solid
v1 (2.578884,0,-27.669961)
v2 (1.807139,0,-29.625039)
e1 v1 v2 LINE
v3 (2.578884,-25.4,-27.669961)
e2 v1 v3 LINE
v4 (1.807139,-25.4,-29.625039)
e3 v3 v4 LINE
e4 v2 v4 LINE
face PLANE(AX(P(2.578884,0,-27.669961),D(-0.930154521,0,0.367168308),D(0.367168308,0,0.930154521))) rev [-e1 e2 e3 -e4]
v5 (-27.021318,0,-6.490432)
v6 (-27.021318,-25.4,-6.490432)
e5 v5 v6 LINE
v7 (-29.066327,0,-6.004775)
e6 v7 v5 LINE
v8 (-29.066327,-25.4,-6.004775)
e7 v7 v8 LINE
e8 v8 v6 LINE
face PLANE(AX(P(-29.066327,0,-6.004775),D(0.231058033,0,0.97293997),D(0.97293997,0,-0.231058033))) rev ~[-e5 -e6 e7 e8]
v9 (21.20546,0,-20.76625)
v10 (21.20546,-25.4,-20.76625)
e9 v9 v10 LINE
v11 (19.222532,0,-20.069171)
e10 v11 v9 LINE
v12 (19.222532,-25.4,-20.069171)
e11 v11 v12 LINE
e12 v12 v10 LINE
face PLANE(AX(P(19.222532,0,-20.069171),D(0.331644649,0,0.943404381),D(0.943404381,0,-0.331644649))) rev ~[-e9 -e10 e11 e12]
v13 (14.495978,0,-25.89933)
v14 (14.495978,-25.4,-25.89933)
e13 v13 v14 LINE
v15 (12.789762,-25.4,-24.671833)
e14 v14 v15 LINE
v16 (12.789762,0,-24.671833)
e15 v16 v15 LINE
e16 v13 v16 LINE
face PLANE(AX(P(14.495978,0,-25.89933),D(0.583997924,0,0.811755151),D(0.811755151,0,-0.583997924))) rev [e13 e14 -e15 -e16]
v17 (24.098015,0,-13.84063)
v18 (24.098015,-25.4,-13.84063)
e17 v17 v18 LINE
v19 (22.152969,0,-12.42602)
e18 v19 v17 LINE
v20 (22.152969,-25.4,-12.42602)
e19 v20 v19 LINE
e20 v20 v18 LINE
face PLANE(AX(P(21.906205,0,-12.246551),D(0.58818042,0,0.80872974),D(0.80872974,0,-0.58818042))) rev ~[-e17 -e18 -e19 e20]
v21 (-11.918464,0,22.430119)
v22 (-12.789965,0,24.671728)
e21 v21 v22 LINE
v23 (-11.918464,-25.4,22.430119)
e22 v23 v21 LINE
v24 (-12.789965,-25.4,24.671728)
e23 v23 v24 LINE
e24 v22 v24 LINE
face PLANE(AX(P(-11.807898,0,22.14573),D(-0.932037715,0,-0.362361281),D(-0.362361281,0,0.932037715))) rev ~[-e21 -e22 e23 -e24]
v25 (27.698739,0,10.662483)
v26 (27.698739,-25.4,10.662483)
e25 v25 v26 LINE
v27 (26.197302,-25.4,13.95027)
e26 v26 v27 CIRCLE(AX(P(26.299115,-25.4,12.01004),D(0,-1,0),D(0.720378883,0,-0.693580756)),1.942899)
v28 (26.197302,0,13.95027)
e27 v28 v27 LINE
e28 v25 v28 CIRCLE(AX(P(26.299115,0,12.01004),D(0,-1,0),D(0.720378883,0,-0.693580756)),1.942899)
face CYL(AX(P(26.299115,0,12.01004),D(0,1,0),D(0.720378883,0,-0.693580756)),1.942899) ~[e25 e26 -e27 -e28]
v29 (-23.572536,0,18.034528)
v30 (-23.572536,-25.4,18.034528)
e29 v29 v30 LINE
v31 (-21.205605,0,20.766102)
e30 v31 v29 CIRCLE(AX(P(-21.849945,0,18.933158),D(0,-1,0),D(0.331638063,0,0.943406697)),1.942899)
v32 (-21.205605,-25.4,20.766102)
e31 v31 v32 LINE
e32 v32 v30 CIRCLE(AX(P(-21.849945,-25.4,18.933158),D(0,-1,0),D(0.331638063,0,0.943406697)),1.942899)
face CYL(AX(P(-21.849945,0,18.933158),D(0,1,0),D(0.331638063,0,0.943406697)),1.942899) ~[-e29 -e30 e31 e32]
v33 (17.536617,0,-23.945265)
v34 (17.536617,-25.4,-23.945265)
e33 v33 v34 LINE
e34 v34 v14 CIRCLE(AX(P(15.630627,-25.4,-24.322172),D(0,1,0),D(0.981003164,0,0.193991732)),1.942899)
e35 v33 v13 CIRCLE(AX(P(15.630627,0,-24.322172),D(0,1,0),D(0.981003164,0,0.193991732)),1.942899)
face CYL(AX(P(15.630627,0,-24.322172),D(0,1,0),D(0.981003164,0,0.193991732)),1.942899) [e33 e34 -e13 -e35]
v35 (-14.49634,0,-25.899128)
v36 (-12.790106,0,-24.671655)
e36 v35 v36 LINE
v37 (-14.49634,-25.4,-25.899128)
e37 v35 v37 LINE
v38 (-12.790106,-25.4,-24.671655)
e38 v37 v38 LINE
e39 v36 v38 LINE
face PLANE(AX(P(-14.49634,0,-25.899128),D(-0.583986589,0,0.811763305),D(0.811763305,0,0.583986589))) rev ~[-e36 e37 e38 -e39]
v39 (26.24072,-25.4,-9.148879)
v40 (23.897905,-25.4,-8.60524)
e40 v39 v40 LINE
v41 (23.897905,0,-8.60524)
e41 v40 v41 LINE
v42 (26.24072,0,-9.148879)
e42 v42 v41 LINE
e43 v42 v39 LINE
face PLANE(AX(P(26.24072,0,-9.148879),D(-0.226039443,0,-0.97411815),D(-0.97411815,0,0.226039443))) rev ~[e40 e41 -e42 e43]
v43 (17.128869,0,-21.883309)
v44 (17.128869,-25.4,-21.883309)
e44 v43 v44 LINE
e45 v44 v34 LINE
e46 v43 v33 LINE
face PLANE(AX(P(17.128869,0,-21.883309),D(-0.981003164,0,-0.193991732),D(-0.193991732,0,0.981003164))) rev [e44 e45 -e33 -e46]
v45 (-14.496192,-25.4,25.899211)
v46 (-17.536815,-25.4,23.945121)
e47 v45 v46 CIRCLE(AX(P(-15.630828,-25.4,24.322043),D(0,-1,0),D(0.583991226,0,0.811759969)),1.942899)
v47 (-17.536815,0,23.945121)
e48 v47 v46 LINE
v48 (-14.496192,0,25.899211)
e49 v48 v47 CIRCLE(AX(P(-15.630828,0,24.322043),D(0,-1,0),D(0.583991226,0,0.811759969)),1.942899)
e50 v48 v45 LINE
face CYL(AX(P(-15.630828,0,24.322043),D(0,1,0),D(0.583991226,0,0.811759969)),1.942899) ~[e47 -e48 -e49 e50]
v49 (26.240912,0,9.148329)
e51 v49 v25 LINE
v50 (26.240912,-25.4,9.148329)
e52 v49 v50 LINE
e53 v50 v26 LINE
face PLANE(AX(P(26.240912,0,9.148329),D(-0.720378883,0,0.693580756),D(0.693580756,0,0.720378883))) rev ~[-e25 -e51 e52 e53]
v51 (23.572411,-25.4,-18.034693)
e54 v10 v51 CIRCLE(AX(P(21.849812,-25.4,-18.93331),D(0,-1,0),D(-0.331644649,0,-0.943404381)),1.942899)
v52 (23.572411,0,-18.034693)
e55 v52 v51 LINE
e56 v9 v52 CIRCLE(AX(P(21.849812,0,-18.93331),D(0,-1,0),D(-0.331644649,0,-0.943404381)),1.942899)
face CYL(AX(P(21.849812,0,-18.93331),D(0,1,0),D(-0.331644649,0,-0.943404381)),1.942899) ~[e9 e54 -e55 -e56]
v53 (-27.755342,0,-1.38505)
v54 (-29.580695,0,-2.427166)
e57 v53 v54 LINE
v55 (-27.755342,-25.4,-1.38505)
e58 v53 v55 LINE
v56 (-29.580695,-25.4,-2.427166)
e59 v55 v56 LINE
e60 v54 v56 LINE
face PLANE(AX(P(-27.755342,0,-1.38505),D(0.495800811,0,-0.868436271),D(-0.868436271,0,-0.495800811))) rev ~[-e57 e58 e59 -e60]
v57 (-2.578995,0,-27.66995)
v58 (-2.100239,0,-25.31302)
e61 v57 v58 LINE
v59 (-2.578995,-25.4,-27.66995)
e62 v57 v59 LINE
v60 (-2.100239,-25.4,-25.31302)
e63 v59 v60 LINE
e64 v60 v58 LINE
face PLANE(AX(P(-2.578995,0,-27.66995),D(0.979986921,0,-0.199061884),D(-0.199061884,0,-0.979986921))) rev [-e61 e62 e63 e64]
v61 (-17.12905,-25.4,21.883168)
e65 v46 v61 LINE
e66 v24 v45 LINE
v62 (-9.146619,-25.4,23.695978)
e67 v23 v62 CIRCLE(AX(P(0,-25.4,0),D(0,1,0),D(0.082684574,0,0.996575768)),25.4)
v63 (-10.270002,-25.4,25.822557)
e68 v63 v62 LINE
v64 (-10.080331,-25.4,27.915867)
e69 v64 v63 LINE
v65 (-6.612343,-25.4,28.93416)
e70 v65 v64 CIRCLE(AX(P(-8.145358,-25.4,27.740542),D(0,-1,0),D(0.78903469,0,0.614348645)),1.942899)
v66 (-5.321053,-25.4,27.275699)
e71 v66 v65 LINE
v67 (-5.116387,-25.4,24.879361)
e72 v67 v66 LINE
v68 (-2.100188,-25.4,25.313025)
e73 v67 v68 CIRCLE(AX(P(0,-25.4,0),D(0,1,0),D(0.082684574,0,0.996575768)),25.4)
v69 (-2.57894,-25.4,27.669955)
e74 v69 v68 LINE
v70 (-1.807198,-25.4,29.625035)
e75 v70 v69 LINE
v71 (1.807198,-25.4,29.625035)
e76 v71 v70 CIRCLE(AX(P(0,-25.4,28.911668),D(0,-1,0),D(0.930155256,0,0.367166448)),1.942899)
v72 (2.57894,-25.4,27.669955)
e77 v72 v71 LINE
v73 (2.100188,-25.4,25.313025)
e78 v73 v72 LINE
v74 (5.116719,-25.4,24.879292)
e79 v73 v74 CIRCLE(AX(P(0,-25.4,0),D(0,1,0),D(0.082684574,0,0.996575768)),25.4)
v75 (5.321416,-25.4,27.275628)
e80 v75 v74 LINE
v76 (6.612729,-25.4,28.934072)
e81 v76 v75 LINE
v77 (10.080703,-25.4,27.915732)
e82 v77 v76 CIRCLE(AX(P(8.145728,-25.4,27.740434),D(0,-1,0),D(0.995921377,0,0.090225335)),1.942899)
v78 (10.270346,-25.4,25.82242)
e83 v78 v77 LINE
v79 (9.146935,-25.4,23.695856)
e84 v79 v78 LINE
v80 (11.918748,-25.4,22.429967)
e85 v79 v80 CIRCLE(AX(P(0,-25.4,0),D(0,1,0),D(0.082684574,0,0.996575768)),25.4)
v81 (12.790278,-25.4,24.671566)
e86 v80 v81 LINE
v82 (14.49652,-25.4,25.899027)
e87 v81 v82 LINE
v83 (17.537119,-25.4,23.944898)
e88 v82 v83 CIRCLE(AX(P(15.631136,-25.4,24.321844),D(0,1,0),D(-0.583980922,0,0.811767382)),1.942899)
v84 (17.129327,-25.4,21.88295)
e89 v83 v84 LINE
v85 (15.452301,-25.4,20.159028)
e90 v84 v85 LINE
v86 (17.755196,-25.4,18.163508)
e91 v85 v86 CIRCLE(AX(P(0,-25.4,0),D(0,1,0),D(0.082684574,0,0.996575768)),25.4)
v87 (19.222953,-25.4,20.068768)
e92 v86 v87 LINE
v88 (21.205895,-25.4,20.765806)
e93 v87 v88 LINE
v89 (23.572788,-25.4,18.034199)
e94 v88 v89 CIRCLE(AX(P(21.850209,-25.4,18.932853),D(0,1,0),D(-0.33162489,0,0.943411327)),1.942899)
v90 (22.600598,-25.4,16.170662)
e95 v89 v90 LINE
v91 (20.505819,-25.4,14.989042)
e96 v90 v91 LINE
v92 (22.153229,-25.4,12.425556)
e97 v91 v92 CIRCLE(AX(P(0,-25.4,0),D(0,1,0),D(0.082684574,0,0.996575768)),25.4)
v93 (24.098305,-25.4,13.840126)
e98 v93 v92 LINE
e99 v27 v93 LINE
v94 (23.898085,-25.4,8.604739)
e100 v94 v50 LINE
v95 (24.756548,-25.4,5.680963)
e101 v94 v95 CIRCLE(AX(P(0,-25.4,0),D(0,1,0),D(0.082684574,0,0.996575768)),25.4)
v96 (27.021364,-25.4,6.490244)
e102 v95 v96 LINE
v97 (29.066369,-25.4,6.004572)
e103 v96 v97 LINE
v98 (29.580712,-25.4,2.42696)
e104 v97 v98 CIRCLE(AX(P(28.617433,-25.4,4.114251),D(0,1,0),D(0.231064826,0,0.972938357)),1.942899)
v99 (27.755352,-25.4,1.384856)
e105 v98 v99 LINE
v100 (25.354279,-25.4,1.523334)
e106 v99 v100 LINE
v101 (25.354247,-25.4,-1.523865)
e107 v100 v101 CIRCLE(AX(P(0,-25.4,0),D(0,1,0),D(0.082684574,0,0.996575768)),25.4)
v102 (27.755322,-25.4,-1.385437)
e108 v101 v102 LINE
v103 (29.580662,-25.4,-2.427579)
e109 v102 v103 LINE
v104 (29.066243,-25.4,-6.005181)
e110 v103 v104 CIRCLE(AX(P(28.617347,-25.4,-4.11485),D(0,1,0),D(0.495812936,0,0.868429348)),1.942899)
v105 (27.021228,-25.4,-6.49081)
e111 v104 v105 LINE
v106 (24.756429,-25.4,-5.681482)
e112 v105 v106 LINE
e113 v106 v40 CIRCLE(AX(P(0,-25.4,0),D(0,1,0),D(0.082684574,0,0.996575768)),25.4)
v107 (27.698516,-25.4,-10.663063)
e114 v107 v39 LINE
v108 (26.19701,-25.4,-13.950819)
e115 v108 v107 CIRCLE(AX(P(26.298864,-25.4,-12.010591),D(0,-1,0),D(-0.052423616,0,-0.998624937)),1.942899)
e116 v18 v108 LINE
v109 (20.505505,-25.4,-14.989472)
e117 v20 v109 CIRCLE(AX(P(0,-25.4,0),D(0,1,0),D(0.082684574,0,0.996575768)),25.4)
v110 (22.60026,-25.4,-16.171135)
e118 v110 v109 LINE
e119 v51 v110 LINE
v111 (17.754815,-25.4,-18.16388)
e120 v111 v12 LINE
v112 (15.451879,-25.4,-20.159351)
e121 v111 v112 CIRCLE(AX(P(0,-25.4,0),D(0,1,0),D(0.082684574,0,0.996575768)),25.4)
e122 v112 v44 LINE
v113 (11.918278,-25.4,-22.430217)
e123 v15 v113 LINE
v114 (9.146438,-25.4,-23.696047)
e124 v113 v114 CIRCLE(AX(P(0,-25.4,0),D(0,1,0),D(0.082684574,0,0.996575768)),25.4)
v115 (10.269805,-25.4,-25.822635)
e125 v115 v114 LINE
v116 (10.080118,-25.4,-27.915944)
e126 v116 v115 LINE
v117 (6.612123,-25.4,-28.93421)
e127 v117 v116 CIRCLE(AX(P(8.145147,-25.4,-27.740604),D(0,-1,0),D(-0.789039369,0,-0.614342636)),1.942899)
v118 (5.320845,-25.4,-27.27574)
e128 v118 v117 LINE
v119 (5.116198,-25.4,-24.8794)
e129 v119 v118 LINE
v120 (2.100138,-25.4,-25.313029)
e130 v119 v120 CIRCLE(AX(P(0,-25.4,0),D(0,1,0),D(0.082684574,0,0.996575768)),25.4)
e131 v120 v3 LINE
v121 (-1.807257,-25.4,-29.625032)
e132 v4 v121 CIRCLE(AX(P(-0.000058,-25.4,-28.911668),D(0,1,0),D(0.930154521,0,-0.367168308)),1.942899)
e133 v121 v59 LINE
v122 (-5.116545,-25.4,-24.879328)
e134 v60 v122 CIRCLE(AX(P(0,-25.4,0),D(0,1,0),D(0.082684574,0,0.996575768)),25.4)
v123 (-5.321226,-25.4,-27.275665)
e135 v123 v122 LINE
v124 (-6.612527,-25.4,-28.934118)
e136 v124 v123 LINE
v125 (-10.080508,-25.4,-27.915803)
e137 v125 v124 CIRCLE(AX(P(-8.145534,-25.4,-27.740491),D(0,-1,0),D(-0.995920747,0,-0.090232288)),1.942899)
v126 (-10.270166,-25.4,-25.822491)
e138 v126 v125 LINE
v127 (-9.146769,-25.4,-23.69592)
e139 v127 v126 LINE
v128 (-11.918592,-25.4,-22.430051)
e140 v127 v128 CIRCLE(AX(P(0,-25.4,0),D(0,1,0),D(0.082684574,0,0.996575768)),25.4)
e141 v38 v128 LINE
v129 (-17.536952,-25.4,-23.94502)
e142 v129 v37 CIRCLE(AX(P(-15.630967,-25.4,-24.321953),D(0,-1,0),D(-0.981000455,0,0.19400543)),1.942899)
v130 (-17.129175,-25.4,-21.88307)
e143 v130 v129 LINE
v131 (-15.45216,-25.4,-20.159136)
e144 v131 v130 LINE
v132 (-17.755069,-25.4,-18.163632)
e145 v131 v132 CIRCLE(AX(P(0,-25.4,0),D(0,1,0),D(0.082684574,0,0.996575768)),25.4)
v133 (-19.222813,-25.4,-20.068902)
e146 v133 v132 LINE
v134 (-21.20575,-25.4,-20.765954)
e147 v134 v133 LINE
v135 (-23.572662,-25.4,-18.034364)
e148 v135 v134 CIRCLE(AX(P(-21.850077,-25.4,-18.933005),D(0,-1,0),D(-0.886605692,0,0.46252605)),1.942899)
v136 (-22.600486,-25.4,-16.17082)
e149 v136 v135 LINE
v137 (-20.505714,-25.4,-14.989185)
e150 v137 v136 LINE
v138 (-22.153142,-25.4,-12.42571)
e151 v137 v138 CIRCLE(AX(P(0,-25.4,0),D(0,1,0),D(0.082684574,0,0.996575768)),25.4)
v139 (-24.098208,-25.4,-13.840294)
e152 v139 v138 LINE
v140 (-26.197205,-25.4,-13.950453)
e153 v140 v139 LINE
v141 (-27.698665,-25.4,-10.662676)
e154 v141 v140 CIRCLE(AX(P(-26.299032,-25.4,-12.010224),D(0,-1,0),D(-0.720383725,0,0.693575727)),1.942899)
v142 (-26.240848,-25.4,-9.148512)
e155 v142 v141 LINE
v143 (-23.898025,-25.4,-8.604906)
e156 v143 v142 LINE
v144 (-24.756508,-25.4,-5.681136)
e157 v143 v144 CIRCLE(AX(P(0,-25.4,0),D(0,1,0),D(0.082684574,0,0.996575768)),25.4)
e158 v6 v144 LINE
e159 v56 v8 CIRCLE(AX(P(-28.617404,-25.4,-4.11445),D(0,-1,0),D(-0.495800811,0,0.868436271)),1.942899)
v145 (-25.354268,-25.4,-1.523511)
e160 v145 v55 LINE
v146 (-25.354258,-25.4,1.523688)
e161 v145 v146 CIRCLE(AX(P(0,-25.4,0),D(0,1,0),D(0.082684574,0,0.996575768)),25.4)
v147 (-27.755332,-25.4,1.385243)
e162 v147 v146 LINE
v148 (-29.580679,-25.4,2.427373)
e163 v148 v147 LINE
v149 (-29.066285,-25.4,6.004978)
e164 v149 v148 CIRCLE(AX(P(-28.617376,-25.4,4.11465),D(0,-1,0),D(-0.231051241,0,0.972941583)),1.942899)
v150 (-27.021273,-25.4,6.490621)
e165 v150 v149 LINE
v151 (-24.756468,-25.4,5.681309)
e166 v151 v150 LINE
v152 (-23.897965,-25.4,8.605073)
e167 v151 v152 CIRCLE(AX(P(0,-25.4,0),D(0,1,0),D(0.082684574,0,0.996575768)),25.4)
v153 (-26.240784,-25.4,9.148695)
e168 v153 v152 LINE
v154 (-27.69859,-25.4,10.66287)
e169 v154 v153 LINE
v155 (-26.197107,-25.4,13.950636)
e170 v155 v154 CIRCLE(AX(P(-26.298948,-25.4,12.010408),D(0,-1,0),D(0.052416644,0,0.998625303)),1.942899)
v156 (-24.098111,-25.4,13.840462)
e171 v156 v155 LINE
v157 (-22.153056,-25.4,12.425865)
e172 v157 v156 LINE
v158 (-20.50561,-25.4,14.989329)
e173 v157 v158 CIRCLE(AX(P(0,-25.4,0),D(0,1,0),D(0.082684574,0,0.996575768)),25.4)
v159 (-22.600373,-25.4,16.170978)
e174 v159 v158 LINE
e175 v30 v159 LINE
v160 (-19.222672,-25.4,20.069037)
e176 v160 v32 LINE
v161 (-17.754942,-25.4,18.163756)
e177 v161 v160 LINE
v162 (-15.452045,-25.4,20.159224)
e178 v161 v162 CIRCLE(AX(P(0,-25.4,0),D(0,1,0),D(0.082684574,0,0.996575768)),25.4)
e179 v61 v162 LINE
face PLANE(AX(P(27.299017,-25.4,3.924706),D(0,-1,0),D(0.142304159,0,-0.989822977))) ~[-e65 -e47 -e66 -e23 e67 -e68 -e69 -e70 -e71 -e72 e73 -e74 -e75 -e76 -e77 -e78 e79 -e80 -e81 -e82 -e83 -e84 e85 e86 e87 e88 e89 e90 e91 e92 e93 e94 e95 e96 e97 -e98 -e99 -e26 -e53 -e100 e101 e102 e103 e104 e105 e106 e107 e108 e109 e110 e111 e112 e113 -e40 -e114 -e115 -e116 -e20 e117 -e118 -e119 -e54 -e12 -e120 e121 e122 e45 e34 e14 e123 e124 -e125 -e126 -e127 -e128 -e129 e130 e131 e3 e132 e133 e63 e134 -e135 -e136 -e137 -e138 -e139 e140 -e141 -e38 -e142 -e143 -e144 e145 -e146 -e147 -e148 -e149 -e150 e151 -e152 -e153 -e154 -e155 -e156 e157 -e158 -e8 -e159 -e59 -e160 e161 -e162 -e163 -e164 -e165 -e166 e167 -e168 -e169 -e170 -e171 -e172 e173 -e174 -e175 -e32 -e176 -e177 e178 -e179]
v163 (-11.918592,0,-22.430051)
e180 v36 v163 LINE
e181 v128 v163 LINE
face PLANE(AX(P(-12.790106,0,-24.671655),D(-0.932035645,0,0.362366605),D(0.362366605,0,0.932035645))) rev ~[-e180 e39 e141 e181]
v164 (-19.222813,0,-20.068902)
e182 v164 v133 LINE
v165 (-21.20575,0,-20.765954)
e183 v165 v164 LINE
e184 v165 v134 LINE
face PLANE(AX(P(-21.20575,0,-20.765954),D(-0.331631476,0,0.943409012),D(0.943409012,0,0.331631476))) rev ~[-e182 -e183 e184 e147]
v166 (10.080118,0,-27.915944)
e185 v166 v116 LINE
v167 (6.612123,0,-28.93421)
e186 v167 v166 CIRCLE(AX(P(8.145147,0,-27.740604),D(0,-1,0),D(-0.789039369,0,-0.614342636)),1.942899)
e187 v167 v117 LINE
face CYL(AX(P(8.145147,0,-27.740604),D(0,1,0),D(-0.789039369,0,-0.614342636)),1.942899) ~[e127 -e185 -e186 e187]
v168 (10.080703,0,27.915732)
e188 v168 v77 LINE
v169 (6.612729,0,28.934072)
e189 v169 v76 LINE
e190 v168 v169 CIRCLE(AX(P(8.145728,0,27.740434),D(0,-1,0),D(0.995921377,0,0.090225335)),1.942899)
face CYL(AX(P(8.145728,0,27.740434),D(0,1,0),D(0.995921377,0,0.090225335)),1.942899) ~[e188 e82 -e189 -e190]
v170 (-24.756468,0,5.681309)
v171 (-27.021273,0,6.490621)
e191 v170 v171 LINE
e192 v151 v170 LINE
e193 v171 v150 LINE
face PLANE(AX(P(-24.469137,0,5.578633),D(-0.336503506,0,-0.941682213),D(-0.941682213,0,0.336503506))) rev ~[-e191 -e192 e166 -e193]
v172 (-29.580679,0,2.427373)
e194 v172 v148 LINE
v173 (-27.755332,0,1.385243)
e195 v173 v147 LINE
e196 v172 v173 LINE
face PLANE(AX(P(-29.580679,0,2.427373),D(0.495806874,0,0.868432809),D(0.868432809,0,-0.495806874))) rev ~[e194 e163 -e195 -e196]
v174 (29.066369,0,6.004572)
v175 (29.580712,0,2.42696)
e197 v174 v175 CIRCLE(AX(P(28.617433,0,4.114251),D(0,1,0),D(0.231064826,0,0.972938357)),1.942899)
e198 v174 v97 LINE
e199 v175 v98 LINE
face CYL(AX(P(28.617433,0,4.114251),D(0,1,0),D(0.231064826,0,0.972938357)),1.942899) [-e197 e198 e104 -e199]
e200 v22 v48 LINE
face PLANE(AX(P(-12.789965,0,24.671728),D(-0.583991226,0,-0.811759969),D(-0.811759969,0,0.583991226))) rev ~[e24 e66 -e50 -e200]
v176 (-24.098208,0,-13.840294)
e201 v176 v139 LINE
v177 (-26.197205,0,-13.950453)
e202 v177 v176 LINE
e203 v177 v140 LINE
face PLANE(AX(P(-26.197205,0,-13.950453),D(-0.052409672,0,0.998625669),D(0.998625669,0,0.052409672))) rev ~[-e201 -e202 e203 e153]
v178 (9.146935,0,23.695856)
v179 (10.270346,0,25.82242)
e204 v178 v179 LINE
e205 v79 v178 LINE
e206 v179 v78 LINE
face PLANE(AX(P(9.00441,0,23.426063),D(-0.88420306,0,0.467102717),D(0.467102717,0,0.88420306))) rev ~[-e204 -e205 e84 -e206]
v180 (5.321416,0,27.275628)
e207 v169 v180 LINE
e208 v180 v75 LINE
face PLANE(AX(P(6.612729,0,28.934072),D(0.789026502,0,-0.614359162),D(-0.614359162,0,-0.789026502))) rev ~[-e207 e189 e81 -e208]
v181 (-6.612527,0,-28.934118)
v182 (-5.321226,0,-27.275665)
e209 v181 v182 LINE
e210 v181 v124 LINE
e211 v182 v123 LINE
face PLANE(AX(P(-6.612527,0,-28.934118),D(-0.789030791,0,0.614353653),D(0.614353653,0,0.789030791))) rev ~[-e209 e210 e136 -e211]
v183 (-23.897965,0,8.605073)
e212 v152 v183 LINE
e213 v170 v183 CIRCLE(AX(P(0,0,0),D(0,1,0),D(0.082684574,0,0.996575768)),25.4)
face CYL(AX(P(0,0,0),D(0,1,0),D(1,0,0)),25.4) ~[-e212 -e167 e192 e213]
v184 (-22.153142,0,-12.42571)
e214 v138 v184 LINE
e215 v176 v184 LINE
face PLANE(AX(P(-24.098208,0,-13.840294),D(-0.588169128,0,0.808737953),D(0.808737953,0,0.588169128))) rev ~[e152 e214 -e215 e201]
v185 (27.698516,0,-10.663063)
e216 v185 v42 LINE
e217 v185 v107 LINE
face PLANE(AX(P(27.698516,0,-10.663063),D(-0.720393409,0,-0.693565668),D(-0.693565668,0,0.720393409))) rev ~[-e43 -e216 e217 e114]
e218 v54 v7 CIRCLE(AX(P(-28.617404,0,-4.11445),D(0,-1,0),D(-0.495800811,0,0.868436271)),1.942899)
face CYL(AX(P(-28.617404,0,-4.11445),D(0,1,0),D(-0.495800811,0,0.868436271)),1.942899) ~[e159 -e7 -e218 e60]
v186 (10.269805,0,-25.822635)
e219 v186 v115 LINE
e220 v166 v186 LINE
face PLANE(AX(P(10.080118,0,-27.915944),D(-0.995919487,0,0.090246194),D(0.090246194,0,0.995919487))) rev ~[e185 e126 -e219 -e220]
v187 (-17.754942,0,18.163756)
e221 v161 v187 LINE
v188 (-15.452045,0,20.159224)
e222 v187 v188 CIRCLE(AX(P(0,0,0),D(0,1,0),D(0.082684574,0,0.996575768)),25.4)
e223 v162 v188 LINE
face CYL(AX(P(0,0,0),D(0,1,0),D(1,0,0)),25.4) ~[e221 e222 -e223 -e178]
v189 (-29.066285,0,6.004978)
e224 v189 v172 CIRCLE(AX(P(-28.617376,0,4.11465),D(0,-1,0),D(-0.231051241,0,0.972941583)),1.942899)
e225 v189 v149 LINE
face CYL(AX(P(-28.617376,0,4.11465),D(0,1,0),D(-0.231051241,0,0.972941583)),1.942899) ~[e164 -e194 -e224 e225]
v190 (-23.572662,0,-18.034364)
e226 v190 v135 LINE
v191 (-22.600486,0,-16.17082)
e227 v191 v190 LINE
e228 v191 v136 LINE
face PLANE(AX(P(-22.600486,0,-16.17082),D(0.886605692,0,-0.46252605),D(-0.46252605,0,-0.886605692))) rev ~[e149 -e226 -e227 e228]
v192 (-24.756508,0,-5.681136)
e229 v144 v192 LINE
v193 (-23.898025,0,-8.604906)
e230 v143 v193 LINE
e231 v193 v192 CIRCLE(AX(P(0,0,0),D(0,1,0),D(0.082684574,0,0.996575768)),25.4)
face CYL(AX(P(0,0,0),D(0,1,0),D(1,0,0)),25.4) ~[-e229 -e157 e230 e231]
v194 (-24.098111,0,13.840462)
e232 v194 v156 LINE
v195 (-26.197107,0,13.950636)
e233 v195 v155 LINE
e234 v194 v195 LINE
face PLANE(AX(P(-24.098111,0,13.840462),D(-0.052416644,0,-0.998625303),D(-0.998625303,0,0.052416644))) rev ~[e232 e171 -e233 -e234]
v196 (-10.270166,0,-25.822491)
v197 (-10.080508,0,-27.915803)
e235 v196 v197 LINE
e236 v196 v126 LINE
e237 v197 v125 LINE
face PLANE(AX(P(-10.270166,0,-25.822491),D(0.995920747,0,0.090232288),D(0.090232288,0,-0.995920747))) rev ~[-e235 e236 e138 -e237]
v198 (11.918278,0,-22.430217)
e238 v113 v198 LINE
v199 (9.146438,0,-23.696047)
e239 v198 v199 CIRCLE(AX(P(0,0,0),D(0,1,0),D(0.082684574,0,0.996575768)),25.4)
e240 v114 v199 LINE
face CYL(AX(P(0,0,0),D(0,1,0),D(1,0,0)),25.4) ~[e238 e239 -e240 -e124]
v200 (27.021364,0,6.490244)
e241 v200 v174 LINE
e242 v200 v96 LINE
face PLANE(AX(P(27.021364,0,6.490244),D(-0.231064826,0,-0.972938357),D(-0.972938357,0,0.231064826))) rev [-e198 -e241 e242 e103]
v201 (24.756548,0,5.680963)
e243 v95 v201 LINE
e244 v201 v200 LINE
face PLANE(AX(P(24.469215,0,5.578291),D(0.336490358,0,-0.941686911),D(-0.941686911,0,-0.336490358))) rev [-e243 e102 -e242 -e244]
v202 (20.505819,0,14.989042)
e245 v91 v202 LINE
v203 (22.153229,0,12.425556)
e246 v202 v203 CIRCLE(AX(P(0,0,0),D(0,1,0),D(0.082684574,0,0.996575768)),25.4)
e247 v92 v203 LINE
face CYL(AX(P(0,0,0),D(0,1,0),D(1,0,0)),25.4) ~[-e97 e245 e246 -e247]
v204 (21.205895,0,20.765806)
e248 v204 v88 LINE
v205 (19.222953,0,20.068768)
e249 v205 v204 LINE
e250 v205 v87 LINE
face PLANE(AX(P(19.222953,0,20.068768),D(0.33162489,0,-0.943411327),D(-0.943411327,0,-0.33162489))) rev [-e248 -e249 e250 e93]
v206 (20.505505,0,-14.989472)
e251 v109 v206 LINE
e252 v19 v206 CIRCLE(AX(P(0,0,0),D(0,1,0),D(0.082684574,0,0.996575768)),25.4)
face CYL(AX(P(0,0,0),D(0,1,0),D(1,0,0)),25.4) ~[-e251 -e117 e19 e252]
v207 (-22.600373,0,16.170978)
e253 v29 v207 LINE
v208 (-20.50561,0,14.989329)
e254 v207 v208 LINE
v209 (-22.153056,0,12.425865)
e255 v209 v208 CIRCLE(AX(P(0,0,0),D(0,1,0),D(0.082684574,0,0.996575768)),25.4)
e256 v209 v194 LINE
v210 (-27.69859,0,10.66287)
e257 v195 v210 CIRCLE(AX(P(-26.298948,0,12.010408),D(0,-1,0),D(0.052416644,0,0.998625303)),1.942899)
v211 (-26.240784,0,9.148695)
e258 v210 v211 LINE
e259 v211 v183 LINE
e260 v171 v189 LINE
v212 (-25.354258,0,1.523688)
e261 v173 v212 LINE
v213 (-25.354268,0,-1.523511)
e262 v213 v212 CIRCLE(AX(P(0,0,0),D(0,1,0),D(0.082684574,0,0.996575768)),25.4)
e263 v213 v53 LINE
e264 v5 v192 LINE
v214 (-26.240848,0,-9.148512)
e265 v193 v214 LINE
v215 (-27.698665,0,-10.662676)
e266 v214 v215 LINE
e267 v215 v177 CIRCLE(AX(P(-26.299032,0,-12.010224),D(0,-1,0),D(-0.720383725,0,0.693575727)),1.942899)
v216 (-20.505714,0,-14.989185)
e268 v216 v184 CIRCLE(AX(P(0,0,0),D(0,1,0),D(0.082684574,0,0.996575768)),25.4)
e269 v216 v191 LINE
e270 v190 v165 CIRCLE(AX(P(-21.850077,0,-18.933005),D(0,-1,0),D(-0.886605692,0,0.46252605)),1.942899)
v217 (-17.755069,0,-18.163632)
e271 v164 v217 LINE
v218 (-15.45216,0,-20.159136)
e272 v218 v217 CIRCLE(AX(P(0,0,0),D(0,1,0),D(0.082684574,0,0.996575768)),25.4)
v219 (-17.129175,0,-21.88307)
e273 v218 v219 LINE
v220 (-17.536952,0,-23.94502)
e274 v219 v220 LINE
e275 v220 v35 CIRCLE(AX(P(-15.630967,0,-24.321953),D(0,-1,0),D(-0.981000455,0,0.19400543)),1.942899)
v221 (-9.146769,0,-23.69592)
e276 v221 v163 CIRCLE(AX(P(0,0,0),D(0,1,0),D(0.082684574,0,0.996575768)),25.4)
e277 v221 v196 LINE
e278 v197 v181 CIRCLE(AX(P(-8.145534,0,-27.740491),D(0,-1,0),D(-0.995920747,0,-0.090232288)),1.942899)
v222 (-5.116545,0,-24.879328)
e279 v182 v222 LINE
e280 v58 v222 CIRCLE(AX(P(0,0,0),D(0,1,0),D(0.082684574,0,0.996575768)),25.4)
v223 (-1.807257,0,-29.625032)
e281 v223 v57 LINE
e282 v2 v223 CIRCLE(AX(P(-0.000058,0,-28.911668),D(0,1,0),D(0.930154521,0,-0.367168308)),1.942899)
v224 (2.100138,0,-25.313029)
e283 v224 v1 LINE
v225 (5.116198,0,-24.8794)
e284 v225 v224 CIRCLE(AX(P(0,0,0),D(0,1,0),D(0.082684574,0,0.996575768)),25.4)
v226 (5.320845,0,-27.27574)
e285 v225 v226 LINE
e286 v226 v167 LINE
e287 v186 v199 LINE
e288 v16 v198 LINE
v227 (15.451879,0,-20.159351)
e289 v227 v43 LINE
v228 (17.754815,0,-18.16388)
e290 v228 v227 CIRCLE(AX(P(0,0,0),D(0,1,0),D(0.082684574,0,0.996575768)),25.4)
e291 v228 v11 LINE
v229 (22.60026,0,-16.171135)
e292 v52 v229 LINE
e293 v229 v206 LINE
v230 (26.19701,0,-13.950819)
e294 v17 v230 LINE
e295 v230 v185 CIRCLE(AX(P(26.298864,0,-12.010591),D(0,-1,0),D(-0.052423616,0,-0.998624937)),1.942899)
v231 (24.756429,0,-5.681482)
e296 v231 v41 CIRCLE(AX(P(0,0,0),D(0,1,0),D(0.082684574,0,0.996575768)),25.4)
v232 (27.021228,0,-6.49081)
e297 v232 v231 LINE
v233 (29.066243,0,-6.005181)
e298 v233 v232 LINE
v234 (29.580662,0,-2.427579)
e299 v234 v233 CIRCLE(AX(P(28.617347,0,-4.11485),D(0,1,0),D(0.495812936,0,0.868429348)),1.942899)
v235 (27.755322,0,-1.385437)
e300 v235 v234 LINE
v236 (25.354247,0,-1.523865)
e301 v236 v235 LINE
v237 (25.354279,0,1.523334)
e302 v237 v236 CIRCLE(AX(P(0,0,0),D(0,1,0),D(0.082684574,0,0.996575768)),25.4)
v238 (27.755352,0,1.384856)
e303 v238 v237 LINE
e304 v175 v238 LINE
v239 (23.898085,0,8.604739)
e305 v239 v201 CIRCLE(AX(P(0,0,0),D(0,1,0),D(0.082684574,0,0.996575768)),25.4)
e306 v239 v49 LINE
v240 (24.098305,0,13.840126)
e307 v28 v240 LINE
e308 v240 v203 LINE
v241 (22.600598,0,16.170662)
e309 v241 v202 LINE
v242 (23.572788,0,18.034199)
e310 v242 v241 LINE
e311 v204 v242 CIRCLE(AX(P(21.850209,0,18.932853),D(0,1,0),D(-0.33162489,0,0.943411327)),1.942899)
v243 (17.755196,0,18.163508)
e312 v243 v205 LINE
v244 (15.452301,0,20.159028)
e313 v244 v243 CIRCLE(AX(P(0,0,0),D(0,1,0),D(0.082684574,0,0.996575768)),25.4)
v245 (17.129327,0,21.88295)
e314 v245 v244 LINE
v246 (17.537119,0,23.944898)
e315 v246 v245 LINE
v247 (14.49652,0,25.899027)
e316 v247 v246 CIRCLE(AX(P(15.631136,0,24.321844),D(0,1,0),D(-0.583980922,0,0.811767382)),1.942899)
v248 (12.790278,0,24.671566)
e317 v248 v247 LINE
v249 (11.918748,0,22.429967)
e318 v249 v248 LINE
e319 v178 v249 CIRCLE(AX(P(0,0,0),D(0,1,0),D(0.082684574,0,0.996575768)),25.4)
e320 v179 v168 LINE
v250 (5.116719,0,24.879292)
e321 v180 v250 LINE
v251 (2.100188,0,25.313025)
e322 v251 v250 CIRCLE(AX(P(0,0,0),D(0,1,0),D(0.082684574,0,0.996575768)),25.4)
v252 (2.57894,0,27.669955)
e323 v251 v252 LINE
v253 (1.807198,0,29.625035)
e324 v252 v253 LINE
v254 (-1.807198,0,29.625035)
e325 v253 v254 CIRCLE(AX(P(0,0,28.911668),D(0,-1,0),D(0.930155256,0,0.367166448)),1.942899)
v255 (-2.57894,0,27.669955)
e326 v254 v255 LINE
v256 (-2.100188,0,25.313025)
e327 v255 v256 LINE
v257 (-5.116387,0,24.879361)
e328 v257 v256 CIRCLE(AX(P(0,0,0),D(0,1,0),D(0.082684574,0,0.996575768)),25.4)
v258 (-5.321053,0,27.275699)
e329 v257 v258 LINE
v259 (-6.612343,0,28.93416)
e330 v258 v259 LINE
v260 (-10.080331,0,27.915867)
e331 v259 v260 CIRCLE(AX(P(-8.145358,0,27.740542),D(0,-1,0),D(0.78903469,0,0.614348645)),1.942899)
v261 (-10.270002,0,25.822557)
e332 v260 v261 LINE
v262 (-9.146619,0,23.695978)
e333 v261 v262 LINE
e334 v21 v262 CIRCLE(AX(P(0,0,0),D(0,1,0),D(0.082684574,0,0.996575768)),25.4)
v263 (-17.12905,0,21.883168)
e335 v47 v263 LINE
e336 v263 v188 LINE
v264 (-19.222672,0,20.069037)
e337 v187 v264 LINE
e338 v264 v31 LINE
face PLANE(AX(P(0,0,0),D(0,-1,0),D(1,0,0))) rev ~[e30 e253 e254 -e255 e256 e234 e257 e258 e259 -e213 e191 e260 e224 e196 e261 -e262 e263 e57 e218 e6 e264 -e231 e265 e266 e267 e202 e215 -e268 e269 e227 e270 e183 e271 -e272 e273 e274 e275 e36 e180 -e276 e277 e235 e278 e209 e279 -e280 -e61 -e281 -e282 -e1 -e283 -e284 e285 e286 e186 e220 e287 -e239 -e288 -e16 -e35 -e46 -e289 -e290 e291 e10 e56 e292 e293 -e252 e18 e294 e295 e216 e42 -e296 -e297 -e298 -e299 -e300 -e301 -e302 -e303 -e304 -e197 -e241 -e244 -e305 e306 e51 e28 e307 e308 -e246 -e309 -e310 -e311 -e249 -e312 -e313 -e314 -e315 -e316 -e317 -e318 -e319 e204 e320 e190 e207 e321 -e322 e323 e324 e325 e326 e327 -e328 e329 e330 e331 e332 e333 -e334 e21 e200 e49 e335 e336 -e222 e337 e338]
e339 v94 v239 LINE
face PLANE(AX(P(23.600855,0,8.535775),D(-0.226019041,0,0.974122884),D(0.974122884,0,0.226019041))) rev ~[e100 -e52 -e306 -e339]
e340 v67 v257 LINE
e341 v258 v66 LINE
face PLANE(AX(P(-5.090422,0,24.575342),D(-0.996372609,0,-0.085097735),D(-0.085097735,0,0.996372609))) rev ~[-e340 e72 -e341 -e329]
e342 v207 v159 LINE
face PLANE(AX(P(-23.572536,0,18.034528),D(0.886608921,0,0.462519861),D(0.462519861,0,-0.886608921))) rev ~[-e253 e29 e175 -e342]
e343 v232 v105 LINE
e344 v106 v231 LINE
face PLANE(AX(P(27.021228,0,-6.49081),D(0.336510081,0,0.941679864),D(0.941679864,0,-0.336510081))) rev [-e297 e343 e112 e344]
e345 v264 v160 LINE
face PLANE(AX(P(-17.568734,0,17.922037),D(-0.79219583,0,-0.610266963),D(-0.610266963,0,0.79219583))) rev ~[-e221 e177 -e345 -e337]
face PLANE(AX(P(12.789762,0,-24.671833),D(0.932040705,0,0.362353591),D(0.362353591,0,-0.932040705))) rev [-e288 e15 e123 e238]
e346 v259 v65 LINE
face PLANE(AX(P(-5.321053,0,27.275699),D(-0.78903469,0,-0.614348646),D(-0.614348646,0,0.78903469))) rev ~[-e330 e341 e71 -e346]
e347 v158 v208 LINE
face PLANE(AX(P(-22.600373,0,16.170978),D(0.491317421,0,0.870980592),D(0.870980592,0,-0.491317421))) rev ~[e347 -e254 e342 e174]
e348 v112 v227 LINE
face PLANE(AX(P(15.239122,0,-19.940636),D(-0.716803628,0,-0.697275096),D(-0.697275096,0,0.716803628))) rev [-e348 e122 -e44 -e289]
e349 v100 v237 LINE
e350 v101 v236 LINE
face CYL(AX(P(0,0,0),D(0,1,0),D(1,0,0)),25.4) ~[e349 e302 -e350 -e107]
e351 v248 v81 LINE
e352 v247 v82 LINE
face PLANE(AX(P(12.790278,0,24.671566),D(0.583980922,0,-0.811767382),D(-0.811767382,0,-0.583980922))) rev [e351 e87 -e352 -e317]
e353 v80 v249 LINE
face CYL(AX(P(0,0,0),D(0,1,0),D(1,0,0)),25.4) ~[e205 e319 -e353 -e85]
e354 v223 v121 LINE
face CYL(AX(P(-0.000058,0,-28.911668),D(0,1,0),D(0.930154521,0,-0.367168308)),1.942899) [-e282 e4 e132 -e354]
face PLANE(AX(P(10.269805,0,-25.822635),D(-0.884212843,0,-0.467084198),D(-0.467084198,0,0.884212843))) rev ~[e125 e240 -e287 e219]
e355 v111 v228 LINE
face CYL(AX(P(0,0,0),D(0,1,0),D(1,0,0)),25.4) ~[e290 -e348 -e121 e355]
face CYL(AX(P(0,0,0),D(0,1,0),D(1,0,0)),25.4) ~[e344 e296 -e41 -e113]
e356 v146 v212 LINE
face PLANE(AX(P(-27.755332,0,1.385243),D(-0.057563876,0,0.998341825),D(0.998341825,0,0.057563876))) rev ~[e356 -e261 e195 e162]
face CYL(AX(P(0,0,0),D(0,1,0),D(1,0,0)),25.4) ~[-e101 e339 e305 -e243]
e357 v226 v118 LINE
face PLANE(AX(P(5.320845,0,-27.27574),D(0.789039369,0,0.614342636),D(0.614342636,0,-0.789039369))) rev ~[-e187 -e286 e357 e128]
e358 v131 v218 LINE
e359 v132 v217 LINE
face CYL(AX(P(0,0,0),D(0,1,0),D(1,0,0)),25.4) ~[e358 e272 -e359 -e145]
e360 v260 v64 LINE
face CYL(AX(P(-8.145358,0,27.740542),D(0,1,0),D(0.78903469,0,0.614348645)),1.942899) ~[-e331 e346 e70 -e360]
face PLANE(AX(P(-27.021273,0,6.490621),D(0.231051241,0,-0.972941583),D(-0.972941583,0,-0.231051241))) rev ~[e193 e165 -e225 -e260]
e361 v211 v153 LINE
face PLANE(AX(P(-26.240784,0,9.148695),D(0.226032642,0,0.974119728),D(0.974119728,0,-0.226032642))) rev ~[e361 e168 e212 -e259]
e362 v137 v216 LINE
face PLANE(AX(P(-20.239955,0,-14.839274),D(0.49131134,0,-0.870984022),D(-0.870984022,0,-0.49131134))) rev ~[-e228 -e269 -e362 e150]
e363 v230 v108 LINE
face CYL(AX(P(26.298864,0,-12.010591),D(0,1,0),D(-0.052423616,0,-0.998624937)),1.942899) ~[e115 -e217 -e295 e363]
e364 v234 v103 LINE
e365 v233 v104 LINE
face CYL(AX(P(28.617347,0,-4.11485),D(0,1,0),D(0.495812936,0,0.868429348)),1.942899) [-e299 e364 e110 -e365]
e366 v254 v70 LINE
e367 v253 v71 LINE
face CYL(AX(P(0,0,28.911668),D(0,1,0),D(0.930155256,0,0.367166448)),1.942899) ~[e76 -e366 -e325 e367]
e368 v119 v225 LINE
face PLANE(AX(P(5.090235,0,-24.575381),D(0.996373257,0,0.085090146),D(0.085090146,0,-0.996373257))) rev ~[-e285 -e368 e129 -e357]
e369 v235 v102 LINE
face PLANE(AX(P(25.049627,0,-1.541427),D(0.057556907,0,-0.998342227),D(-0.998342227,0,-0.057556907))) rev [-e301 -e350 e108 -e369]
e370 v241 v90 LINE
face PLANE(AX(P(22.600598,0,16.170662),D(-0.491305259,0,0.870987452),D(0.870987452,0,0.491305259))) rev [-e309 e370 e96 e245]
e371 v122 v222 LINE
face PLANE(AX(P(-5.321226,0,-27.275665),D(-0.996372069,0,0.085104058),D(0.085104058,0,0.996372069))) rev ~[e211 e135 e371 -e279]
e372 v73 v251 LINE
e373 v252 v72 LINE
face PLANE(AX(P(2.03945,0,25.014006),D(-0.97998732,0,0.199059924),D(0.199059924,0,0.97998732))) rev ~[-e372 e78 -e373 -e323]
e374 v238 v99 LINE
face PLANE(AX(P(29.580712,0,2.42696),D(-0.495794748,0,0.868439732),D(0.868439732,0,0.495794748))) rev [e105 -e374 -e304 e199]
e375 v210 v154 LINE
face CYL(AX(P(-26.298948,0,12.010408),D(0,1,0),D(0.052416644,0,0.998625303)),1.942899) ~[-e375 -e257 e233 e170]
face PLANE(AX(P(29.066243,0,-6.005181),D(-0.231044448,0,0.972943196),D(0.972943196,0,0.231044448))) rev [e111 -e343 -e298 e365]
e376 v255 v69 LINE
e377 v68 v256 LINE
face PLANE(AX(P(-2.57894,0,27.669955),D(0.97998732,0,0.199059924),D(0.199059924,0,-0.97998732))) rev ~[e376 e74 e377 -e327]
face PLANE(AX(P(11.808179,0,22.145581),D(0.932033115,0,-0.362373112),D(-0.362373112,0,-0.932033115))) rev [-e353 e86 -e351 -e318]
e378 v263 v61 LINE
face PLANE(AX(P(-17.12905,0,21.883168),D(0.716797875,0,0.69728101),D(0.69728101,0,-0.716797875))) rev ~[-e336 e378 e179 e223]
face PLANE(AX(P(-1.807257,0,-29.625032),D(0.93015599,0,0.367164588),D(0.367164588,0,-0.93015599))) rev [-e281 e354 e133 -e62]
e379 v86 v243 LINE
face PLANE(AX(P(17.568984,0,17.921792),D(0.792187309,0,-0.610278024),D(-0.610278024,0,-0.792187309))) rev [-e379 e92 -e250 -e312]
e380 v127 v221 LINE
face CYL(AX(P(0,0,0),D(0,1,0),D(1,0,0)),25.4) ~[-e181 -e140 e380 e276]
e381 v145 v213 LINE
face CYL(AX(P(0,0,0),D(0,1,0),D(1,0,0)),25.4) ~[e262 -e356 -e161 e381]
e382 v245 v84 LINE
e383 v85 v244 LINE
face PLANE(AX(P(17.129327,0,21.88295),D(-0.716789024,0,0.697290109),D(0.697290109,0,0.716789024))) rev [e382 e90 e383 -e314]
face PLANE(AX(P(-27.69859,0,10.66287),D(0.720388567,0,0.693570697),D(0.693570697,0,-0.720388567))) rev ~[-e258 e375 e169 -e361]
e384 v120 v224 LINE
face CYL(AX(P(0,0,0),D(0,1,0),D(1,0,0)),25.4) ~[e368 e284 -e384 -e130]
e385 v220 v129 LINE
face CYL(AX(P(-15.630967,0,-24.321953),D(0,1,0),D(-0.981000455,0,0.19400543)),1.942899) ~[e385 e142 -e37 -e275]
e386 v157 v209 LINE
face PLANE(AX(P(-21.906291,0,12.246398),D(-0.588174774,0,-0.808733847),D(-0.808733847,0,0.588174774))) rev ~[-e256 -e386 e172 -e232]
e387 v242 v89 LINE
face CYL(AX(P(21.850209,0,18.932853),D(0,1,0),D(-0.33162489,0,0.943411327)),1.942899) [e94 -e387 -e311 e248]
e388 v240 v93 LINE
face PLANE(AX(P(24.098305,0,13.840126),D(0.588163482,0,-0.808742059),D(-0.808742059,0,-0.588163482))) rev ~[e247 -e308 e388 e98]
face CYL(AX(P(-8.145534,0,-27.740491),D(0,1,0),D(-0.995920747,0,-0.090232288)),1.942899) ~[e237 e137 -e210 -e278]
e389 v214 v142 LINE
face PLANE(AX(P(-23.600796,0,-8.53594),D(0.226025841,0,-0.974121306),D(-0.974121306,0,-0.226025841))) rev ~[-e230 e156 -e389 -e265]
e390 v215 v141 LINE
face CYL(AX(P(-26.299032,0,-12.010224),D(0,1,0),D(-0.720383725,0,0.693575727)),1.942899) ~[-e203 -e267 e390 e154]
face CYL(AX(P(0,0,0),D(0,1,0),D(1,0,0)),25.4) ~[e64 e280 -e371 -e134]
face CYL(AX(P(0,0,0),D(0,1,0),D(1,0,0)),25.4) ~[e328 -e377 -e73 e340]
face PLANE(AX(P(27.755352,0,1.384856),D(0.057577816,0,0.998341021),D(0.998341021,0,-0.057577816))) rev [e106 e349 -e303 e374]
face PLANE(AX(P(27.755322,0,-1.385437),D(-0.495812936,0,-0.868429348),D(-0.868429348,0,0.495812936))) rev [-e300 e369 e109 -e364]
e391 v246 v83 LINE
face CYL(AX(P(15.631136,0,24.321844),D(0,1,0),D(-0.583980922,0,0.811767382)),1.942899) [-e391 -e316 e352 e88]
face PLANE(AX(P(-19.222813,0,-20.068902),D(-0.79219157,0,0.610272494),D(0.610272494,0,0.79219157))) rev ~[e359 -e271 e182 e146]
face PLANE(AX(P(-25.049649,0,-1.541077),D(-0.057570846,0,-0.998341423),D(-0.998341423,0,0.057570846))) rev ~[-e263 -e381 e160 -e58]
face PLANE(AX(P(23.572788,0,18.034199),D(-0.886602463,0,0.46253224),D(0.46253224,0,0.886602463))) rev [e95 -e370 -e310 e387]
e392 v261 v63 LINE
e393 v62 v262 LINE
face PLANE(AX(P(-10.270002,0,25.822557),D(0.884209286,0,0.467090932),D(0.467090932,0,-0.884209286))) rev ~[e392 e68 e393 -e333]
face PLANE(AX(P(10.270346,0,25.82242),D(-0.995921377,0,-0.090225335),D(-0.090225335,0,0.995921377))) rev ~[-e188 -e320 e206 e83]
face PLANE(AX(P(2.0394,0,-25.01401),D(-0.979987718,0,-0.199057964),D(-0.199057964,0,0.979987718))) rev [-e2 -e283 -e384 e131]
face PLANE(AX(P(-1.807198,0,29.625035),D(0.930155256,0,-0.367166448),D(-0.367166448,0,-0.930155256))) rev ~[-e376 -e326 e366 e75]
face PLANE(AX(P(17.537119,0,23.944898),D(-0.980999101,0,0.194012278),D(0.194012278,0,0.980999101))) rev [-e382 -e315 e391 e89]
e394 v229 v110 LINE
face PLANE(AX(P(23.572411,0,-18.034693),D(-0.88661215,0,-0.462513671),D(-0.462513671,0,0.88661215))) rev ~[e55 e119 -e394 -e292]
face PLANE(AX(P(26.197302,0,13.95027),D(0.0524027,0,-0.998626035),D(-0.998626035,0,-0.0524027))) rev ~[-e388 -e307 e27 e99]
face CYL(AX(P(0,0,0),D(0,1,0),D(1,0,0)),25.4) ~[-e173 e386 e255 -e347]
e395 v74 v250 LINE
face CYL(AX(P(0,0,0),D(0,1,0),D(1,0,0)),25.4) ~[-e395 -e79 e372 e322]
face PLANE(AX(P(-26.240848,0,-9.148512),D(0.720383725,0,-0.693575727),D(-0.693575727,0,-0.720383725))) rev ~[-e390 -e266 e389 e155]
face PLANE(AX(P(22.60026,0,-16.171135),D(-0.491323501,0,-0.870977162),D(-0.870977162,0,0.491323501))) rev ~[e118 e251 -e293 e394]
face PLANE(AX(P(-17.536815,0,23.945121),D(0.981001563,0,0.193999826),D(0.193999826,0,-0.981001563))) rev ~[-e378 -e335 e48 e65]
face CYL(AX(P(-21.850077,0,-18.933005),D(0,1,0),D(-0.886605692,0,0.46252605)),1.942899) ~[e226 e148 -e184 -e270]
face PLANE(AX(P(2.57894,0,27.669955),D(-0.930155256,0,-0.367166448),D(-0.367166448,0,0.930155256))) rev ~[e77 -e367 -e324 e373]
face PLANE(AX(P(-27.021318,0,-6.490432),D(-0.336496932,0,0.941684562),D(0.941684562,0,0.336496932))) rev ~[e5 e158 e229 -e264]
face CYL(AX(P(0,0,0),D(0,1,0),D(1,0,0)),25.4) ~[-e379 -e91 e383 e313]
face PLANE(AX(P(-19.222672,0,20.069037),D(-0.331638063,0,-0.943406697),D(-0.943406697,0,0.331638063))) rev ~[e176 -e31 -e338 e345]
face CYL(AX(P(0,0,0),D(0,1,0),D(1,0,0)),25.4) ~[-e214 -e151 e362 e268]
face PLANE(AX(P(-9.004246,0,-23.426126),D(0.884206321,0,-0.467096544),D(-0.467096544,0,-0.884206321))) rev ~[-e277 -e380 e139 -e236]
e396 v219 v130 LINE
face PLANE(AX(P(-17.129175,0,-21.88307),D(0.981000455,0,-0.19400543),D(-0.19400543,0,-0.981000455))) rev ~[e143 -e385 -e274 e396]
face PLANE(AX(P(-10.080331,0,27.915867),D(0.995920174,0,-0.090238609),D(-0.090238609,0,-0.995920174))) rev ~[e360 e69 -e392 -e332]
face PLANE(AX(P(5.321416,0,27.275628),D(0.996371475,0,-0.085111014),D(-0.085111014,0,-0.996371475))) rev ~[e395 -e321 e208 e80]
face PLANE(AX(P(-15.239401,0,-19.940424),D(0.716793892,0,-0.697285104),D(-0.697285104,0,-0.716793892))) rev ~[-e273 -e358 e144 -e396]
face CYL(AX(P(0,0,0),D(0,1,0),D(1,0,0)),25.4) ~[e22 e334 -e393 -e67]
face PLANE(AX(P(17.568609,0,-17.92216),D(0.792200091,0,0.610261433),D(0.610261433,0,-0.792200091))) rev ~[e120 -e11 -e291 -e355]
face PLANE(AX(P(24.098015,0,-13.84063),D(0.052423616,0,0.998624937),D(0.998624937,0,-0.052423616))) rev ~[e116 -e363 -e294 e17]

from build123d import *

# Parameters (mm, degrees)
F0_R             = 25.4
F1_DEPTH         = 25.4
F4_DEPTH         = 25.4
F4_COPIES_COUNT  = 8
F4_COPIES_ANGLE  = 343.6356
F4_COPIES1_COUNT = 3
F4_COPIES1_ANGLE = 32.7272727273
F4_COPIES2_COUNT = 3
F4_COPIES2_ANGLE = 130.9088
F4_COPIES3_COUNT = 3
F4_COPIES3_ANGLE = 163.636
F4_COPIES4_COUNT = 3
F4_COPIES4_ANGLE = 229.0904


# Not quite as in the source:
# - a pattern or mirror of a feature is missing from the dataset's text; its kind, count and spacing are read off the source's solid


with BuildPart() as f1:
    # F0 (on Front) → F1 (new body)
    with BuildSketch(Plane.XZ):
        Circle(F0_R)
    extrude(amount=F1_DEPTH)

    # F3 (on Front) → F4 (join)
    with BuildSketch(Plane.XZ):
        with BuildLine():
            ThreePointArc((-2.0394499691, 25.0140055699), (0, 25.0970084039), (2.0394499691, 25.0140055699))
            Line((2.0394499691, 25.0140055699), (2.5789397816, 27.6699554159))
            Line((2.5789397816, 27.6699554159), (1.8071979284, 29.6250353105))
            ThreePointArc((1.8071979284, 29.6250353105), (0, 30.8545671303), (-1.8071979284, 29.6250353105))
            Line((-1.8071979284, 29.6250353105), (-2.5789397816, 27.6699554159))
            Line((-2.5789397816, 27.6699554159), (-2.0394499691, 25.0140055699))
        make_face()
    f4 = extrude(amount=F4_DEPTH)

    # F4_copies: F4 ×8 about axis
    f4_copies_axis = Axis((0, 0, 0), (0, -1, 0))
    for i in range(1, F4_COPIES_COUNT):
        add(f4.rotate(f4_copies_axis, i * F4_COPIES_ANGLE / (F4_COPIES_COUNT - 1)))

    # F4_copies1: F4 ×3 about axis
    f4_copies1_axis = Axis((0, 0, 0), (0, -1, 0))
    for i in range(1, F4_COPIES1_COUNT):
        add(f4.rotate(f4_copies1_axis, i * F4_COPIES1_ANGLE / (F4_COPIES1_COUNT - 1)))

    # F4_copies2: F4 ×3 about axis
    f4_copies2_axis = Axis((0, 0, 0), (0, -1, 0))
    for i in range(1, F4_COPIES2_COUNT):
        add(f4.rotate(f4_copies2_axis, i * F4_COPIES2_ANGLE / (F4_COPIES2_COUNT - 1)))

    # F4_copies3: F4 ×3 about axis
    f4_copies3_axis = Axis((0, 0, 0), (0, -1, 0))
    for i in range(1, F4_COPIES3_COUNT):
        add(f4.rotate(f4_copies3_axis, i * F4_COPIES3_ANGLE / (F4_COPIES3_COUNT - 1)))

    # F4_copies4: F4 ×3 about axis
    f4_copies4_axis = Axis((0, 0, 0), (0, -1, 0))
    for i in range(1, F4_COPIES4_COUNT):
        add(f4.rotate(f4_copies4_axis, i * F4_COPIES4_ANGLE / (F4_COPIES4_COUNT - 1)))

    # F4_copies5: F4 across plane
    add(f4.mirror(Plane(origin=(0, 0, 0), x_dir=(-0.7557528993, 0, -0.6548568968), z_dir=(0.6548568968, 0, -0.7557528993))))

    # F4_copies6: F4 across plane
    add(f4.mirror(Plane(origin=(0, 0, 0), x_dir=(-0.9594941358, 0, -0.2817285986), z_dir=(0.2817285986, 0, -0.9594941358))))

    # F4_copies7: F4 across plane
    add(f4.mirror(Plane(origin=(0, 0, 0), x_dir=(-1, 0, 1e-06), z_dir=(-1e-06, 0, -1))))

    # F4_copies8: F4 across plane
    add(f4.mirror(Plane(origin=(0, 0, 0), x_dir=(0.4154204975, 0, 0.9096294907), z_dir=(0.9096294907, 0, -0.4154204975))))

    # F4_copies9: F4 across plane
    add(f4.mirror(Plane(origin=(0, 0, 0), x_dir=(0.6548648109, 0, 0.7557460416), z_dir=(0.7557460416, 0, -0.6548648109))))

    # F4_copies10: F4 across plane
    add(f4.mirror(Plane(origin=(0, 0, 0), x_dir=(0.2817386464, 0, 0.9594911855), z_dir=(0.9594911855, 0, -0.2817386464))))


solid = f1.part
